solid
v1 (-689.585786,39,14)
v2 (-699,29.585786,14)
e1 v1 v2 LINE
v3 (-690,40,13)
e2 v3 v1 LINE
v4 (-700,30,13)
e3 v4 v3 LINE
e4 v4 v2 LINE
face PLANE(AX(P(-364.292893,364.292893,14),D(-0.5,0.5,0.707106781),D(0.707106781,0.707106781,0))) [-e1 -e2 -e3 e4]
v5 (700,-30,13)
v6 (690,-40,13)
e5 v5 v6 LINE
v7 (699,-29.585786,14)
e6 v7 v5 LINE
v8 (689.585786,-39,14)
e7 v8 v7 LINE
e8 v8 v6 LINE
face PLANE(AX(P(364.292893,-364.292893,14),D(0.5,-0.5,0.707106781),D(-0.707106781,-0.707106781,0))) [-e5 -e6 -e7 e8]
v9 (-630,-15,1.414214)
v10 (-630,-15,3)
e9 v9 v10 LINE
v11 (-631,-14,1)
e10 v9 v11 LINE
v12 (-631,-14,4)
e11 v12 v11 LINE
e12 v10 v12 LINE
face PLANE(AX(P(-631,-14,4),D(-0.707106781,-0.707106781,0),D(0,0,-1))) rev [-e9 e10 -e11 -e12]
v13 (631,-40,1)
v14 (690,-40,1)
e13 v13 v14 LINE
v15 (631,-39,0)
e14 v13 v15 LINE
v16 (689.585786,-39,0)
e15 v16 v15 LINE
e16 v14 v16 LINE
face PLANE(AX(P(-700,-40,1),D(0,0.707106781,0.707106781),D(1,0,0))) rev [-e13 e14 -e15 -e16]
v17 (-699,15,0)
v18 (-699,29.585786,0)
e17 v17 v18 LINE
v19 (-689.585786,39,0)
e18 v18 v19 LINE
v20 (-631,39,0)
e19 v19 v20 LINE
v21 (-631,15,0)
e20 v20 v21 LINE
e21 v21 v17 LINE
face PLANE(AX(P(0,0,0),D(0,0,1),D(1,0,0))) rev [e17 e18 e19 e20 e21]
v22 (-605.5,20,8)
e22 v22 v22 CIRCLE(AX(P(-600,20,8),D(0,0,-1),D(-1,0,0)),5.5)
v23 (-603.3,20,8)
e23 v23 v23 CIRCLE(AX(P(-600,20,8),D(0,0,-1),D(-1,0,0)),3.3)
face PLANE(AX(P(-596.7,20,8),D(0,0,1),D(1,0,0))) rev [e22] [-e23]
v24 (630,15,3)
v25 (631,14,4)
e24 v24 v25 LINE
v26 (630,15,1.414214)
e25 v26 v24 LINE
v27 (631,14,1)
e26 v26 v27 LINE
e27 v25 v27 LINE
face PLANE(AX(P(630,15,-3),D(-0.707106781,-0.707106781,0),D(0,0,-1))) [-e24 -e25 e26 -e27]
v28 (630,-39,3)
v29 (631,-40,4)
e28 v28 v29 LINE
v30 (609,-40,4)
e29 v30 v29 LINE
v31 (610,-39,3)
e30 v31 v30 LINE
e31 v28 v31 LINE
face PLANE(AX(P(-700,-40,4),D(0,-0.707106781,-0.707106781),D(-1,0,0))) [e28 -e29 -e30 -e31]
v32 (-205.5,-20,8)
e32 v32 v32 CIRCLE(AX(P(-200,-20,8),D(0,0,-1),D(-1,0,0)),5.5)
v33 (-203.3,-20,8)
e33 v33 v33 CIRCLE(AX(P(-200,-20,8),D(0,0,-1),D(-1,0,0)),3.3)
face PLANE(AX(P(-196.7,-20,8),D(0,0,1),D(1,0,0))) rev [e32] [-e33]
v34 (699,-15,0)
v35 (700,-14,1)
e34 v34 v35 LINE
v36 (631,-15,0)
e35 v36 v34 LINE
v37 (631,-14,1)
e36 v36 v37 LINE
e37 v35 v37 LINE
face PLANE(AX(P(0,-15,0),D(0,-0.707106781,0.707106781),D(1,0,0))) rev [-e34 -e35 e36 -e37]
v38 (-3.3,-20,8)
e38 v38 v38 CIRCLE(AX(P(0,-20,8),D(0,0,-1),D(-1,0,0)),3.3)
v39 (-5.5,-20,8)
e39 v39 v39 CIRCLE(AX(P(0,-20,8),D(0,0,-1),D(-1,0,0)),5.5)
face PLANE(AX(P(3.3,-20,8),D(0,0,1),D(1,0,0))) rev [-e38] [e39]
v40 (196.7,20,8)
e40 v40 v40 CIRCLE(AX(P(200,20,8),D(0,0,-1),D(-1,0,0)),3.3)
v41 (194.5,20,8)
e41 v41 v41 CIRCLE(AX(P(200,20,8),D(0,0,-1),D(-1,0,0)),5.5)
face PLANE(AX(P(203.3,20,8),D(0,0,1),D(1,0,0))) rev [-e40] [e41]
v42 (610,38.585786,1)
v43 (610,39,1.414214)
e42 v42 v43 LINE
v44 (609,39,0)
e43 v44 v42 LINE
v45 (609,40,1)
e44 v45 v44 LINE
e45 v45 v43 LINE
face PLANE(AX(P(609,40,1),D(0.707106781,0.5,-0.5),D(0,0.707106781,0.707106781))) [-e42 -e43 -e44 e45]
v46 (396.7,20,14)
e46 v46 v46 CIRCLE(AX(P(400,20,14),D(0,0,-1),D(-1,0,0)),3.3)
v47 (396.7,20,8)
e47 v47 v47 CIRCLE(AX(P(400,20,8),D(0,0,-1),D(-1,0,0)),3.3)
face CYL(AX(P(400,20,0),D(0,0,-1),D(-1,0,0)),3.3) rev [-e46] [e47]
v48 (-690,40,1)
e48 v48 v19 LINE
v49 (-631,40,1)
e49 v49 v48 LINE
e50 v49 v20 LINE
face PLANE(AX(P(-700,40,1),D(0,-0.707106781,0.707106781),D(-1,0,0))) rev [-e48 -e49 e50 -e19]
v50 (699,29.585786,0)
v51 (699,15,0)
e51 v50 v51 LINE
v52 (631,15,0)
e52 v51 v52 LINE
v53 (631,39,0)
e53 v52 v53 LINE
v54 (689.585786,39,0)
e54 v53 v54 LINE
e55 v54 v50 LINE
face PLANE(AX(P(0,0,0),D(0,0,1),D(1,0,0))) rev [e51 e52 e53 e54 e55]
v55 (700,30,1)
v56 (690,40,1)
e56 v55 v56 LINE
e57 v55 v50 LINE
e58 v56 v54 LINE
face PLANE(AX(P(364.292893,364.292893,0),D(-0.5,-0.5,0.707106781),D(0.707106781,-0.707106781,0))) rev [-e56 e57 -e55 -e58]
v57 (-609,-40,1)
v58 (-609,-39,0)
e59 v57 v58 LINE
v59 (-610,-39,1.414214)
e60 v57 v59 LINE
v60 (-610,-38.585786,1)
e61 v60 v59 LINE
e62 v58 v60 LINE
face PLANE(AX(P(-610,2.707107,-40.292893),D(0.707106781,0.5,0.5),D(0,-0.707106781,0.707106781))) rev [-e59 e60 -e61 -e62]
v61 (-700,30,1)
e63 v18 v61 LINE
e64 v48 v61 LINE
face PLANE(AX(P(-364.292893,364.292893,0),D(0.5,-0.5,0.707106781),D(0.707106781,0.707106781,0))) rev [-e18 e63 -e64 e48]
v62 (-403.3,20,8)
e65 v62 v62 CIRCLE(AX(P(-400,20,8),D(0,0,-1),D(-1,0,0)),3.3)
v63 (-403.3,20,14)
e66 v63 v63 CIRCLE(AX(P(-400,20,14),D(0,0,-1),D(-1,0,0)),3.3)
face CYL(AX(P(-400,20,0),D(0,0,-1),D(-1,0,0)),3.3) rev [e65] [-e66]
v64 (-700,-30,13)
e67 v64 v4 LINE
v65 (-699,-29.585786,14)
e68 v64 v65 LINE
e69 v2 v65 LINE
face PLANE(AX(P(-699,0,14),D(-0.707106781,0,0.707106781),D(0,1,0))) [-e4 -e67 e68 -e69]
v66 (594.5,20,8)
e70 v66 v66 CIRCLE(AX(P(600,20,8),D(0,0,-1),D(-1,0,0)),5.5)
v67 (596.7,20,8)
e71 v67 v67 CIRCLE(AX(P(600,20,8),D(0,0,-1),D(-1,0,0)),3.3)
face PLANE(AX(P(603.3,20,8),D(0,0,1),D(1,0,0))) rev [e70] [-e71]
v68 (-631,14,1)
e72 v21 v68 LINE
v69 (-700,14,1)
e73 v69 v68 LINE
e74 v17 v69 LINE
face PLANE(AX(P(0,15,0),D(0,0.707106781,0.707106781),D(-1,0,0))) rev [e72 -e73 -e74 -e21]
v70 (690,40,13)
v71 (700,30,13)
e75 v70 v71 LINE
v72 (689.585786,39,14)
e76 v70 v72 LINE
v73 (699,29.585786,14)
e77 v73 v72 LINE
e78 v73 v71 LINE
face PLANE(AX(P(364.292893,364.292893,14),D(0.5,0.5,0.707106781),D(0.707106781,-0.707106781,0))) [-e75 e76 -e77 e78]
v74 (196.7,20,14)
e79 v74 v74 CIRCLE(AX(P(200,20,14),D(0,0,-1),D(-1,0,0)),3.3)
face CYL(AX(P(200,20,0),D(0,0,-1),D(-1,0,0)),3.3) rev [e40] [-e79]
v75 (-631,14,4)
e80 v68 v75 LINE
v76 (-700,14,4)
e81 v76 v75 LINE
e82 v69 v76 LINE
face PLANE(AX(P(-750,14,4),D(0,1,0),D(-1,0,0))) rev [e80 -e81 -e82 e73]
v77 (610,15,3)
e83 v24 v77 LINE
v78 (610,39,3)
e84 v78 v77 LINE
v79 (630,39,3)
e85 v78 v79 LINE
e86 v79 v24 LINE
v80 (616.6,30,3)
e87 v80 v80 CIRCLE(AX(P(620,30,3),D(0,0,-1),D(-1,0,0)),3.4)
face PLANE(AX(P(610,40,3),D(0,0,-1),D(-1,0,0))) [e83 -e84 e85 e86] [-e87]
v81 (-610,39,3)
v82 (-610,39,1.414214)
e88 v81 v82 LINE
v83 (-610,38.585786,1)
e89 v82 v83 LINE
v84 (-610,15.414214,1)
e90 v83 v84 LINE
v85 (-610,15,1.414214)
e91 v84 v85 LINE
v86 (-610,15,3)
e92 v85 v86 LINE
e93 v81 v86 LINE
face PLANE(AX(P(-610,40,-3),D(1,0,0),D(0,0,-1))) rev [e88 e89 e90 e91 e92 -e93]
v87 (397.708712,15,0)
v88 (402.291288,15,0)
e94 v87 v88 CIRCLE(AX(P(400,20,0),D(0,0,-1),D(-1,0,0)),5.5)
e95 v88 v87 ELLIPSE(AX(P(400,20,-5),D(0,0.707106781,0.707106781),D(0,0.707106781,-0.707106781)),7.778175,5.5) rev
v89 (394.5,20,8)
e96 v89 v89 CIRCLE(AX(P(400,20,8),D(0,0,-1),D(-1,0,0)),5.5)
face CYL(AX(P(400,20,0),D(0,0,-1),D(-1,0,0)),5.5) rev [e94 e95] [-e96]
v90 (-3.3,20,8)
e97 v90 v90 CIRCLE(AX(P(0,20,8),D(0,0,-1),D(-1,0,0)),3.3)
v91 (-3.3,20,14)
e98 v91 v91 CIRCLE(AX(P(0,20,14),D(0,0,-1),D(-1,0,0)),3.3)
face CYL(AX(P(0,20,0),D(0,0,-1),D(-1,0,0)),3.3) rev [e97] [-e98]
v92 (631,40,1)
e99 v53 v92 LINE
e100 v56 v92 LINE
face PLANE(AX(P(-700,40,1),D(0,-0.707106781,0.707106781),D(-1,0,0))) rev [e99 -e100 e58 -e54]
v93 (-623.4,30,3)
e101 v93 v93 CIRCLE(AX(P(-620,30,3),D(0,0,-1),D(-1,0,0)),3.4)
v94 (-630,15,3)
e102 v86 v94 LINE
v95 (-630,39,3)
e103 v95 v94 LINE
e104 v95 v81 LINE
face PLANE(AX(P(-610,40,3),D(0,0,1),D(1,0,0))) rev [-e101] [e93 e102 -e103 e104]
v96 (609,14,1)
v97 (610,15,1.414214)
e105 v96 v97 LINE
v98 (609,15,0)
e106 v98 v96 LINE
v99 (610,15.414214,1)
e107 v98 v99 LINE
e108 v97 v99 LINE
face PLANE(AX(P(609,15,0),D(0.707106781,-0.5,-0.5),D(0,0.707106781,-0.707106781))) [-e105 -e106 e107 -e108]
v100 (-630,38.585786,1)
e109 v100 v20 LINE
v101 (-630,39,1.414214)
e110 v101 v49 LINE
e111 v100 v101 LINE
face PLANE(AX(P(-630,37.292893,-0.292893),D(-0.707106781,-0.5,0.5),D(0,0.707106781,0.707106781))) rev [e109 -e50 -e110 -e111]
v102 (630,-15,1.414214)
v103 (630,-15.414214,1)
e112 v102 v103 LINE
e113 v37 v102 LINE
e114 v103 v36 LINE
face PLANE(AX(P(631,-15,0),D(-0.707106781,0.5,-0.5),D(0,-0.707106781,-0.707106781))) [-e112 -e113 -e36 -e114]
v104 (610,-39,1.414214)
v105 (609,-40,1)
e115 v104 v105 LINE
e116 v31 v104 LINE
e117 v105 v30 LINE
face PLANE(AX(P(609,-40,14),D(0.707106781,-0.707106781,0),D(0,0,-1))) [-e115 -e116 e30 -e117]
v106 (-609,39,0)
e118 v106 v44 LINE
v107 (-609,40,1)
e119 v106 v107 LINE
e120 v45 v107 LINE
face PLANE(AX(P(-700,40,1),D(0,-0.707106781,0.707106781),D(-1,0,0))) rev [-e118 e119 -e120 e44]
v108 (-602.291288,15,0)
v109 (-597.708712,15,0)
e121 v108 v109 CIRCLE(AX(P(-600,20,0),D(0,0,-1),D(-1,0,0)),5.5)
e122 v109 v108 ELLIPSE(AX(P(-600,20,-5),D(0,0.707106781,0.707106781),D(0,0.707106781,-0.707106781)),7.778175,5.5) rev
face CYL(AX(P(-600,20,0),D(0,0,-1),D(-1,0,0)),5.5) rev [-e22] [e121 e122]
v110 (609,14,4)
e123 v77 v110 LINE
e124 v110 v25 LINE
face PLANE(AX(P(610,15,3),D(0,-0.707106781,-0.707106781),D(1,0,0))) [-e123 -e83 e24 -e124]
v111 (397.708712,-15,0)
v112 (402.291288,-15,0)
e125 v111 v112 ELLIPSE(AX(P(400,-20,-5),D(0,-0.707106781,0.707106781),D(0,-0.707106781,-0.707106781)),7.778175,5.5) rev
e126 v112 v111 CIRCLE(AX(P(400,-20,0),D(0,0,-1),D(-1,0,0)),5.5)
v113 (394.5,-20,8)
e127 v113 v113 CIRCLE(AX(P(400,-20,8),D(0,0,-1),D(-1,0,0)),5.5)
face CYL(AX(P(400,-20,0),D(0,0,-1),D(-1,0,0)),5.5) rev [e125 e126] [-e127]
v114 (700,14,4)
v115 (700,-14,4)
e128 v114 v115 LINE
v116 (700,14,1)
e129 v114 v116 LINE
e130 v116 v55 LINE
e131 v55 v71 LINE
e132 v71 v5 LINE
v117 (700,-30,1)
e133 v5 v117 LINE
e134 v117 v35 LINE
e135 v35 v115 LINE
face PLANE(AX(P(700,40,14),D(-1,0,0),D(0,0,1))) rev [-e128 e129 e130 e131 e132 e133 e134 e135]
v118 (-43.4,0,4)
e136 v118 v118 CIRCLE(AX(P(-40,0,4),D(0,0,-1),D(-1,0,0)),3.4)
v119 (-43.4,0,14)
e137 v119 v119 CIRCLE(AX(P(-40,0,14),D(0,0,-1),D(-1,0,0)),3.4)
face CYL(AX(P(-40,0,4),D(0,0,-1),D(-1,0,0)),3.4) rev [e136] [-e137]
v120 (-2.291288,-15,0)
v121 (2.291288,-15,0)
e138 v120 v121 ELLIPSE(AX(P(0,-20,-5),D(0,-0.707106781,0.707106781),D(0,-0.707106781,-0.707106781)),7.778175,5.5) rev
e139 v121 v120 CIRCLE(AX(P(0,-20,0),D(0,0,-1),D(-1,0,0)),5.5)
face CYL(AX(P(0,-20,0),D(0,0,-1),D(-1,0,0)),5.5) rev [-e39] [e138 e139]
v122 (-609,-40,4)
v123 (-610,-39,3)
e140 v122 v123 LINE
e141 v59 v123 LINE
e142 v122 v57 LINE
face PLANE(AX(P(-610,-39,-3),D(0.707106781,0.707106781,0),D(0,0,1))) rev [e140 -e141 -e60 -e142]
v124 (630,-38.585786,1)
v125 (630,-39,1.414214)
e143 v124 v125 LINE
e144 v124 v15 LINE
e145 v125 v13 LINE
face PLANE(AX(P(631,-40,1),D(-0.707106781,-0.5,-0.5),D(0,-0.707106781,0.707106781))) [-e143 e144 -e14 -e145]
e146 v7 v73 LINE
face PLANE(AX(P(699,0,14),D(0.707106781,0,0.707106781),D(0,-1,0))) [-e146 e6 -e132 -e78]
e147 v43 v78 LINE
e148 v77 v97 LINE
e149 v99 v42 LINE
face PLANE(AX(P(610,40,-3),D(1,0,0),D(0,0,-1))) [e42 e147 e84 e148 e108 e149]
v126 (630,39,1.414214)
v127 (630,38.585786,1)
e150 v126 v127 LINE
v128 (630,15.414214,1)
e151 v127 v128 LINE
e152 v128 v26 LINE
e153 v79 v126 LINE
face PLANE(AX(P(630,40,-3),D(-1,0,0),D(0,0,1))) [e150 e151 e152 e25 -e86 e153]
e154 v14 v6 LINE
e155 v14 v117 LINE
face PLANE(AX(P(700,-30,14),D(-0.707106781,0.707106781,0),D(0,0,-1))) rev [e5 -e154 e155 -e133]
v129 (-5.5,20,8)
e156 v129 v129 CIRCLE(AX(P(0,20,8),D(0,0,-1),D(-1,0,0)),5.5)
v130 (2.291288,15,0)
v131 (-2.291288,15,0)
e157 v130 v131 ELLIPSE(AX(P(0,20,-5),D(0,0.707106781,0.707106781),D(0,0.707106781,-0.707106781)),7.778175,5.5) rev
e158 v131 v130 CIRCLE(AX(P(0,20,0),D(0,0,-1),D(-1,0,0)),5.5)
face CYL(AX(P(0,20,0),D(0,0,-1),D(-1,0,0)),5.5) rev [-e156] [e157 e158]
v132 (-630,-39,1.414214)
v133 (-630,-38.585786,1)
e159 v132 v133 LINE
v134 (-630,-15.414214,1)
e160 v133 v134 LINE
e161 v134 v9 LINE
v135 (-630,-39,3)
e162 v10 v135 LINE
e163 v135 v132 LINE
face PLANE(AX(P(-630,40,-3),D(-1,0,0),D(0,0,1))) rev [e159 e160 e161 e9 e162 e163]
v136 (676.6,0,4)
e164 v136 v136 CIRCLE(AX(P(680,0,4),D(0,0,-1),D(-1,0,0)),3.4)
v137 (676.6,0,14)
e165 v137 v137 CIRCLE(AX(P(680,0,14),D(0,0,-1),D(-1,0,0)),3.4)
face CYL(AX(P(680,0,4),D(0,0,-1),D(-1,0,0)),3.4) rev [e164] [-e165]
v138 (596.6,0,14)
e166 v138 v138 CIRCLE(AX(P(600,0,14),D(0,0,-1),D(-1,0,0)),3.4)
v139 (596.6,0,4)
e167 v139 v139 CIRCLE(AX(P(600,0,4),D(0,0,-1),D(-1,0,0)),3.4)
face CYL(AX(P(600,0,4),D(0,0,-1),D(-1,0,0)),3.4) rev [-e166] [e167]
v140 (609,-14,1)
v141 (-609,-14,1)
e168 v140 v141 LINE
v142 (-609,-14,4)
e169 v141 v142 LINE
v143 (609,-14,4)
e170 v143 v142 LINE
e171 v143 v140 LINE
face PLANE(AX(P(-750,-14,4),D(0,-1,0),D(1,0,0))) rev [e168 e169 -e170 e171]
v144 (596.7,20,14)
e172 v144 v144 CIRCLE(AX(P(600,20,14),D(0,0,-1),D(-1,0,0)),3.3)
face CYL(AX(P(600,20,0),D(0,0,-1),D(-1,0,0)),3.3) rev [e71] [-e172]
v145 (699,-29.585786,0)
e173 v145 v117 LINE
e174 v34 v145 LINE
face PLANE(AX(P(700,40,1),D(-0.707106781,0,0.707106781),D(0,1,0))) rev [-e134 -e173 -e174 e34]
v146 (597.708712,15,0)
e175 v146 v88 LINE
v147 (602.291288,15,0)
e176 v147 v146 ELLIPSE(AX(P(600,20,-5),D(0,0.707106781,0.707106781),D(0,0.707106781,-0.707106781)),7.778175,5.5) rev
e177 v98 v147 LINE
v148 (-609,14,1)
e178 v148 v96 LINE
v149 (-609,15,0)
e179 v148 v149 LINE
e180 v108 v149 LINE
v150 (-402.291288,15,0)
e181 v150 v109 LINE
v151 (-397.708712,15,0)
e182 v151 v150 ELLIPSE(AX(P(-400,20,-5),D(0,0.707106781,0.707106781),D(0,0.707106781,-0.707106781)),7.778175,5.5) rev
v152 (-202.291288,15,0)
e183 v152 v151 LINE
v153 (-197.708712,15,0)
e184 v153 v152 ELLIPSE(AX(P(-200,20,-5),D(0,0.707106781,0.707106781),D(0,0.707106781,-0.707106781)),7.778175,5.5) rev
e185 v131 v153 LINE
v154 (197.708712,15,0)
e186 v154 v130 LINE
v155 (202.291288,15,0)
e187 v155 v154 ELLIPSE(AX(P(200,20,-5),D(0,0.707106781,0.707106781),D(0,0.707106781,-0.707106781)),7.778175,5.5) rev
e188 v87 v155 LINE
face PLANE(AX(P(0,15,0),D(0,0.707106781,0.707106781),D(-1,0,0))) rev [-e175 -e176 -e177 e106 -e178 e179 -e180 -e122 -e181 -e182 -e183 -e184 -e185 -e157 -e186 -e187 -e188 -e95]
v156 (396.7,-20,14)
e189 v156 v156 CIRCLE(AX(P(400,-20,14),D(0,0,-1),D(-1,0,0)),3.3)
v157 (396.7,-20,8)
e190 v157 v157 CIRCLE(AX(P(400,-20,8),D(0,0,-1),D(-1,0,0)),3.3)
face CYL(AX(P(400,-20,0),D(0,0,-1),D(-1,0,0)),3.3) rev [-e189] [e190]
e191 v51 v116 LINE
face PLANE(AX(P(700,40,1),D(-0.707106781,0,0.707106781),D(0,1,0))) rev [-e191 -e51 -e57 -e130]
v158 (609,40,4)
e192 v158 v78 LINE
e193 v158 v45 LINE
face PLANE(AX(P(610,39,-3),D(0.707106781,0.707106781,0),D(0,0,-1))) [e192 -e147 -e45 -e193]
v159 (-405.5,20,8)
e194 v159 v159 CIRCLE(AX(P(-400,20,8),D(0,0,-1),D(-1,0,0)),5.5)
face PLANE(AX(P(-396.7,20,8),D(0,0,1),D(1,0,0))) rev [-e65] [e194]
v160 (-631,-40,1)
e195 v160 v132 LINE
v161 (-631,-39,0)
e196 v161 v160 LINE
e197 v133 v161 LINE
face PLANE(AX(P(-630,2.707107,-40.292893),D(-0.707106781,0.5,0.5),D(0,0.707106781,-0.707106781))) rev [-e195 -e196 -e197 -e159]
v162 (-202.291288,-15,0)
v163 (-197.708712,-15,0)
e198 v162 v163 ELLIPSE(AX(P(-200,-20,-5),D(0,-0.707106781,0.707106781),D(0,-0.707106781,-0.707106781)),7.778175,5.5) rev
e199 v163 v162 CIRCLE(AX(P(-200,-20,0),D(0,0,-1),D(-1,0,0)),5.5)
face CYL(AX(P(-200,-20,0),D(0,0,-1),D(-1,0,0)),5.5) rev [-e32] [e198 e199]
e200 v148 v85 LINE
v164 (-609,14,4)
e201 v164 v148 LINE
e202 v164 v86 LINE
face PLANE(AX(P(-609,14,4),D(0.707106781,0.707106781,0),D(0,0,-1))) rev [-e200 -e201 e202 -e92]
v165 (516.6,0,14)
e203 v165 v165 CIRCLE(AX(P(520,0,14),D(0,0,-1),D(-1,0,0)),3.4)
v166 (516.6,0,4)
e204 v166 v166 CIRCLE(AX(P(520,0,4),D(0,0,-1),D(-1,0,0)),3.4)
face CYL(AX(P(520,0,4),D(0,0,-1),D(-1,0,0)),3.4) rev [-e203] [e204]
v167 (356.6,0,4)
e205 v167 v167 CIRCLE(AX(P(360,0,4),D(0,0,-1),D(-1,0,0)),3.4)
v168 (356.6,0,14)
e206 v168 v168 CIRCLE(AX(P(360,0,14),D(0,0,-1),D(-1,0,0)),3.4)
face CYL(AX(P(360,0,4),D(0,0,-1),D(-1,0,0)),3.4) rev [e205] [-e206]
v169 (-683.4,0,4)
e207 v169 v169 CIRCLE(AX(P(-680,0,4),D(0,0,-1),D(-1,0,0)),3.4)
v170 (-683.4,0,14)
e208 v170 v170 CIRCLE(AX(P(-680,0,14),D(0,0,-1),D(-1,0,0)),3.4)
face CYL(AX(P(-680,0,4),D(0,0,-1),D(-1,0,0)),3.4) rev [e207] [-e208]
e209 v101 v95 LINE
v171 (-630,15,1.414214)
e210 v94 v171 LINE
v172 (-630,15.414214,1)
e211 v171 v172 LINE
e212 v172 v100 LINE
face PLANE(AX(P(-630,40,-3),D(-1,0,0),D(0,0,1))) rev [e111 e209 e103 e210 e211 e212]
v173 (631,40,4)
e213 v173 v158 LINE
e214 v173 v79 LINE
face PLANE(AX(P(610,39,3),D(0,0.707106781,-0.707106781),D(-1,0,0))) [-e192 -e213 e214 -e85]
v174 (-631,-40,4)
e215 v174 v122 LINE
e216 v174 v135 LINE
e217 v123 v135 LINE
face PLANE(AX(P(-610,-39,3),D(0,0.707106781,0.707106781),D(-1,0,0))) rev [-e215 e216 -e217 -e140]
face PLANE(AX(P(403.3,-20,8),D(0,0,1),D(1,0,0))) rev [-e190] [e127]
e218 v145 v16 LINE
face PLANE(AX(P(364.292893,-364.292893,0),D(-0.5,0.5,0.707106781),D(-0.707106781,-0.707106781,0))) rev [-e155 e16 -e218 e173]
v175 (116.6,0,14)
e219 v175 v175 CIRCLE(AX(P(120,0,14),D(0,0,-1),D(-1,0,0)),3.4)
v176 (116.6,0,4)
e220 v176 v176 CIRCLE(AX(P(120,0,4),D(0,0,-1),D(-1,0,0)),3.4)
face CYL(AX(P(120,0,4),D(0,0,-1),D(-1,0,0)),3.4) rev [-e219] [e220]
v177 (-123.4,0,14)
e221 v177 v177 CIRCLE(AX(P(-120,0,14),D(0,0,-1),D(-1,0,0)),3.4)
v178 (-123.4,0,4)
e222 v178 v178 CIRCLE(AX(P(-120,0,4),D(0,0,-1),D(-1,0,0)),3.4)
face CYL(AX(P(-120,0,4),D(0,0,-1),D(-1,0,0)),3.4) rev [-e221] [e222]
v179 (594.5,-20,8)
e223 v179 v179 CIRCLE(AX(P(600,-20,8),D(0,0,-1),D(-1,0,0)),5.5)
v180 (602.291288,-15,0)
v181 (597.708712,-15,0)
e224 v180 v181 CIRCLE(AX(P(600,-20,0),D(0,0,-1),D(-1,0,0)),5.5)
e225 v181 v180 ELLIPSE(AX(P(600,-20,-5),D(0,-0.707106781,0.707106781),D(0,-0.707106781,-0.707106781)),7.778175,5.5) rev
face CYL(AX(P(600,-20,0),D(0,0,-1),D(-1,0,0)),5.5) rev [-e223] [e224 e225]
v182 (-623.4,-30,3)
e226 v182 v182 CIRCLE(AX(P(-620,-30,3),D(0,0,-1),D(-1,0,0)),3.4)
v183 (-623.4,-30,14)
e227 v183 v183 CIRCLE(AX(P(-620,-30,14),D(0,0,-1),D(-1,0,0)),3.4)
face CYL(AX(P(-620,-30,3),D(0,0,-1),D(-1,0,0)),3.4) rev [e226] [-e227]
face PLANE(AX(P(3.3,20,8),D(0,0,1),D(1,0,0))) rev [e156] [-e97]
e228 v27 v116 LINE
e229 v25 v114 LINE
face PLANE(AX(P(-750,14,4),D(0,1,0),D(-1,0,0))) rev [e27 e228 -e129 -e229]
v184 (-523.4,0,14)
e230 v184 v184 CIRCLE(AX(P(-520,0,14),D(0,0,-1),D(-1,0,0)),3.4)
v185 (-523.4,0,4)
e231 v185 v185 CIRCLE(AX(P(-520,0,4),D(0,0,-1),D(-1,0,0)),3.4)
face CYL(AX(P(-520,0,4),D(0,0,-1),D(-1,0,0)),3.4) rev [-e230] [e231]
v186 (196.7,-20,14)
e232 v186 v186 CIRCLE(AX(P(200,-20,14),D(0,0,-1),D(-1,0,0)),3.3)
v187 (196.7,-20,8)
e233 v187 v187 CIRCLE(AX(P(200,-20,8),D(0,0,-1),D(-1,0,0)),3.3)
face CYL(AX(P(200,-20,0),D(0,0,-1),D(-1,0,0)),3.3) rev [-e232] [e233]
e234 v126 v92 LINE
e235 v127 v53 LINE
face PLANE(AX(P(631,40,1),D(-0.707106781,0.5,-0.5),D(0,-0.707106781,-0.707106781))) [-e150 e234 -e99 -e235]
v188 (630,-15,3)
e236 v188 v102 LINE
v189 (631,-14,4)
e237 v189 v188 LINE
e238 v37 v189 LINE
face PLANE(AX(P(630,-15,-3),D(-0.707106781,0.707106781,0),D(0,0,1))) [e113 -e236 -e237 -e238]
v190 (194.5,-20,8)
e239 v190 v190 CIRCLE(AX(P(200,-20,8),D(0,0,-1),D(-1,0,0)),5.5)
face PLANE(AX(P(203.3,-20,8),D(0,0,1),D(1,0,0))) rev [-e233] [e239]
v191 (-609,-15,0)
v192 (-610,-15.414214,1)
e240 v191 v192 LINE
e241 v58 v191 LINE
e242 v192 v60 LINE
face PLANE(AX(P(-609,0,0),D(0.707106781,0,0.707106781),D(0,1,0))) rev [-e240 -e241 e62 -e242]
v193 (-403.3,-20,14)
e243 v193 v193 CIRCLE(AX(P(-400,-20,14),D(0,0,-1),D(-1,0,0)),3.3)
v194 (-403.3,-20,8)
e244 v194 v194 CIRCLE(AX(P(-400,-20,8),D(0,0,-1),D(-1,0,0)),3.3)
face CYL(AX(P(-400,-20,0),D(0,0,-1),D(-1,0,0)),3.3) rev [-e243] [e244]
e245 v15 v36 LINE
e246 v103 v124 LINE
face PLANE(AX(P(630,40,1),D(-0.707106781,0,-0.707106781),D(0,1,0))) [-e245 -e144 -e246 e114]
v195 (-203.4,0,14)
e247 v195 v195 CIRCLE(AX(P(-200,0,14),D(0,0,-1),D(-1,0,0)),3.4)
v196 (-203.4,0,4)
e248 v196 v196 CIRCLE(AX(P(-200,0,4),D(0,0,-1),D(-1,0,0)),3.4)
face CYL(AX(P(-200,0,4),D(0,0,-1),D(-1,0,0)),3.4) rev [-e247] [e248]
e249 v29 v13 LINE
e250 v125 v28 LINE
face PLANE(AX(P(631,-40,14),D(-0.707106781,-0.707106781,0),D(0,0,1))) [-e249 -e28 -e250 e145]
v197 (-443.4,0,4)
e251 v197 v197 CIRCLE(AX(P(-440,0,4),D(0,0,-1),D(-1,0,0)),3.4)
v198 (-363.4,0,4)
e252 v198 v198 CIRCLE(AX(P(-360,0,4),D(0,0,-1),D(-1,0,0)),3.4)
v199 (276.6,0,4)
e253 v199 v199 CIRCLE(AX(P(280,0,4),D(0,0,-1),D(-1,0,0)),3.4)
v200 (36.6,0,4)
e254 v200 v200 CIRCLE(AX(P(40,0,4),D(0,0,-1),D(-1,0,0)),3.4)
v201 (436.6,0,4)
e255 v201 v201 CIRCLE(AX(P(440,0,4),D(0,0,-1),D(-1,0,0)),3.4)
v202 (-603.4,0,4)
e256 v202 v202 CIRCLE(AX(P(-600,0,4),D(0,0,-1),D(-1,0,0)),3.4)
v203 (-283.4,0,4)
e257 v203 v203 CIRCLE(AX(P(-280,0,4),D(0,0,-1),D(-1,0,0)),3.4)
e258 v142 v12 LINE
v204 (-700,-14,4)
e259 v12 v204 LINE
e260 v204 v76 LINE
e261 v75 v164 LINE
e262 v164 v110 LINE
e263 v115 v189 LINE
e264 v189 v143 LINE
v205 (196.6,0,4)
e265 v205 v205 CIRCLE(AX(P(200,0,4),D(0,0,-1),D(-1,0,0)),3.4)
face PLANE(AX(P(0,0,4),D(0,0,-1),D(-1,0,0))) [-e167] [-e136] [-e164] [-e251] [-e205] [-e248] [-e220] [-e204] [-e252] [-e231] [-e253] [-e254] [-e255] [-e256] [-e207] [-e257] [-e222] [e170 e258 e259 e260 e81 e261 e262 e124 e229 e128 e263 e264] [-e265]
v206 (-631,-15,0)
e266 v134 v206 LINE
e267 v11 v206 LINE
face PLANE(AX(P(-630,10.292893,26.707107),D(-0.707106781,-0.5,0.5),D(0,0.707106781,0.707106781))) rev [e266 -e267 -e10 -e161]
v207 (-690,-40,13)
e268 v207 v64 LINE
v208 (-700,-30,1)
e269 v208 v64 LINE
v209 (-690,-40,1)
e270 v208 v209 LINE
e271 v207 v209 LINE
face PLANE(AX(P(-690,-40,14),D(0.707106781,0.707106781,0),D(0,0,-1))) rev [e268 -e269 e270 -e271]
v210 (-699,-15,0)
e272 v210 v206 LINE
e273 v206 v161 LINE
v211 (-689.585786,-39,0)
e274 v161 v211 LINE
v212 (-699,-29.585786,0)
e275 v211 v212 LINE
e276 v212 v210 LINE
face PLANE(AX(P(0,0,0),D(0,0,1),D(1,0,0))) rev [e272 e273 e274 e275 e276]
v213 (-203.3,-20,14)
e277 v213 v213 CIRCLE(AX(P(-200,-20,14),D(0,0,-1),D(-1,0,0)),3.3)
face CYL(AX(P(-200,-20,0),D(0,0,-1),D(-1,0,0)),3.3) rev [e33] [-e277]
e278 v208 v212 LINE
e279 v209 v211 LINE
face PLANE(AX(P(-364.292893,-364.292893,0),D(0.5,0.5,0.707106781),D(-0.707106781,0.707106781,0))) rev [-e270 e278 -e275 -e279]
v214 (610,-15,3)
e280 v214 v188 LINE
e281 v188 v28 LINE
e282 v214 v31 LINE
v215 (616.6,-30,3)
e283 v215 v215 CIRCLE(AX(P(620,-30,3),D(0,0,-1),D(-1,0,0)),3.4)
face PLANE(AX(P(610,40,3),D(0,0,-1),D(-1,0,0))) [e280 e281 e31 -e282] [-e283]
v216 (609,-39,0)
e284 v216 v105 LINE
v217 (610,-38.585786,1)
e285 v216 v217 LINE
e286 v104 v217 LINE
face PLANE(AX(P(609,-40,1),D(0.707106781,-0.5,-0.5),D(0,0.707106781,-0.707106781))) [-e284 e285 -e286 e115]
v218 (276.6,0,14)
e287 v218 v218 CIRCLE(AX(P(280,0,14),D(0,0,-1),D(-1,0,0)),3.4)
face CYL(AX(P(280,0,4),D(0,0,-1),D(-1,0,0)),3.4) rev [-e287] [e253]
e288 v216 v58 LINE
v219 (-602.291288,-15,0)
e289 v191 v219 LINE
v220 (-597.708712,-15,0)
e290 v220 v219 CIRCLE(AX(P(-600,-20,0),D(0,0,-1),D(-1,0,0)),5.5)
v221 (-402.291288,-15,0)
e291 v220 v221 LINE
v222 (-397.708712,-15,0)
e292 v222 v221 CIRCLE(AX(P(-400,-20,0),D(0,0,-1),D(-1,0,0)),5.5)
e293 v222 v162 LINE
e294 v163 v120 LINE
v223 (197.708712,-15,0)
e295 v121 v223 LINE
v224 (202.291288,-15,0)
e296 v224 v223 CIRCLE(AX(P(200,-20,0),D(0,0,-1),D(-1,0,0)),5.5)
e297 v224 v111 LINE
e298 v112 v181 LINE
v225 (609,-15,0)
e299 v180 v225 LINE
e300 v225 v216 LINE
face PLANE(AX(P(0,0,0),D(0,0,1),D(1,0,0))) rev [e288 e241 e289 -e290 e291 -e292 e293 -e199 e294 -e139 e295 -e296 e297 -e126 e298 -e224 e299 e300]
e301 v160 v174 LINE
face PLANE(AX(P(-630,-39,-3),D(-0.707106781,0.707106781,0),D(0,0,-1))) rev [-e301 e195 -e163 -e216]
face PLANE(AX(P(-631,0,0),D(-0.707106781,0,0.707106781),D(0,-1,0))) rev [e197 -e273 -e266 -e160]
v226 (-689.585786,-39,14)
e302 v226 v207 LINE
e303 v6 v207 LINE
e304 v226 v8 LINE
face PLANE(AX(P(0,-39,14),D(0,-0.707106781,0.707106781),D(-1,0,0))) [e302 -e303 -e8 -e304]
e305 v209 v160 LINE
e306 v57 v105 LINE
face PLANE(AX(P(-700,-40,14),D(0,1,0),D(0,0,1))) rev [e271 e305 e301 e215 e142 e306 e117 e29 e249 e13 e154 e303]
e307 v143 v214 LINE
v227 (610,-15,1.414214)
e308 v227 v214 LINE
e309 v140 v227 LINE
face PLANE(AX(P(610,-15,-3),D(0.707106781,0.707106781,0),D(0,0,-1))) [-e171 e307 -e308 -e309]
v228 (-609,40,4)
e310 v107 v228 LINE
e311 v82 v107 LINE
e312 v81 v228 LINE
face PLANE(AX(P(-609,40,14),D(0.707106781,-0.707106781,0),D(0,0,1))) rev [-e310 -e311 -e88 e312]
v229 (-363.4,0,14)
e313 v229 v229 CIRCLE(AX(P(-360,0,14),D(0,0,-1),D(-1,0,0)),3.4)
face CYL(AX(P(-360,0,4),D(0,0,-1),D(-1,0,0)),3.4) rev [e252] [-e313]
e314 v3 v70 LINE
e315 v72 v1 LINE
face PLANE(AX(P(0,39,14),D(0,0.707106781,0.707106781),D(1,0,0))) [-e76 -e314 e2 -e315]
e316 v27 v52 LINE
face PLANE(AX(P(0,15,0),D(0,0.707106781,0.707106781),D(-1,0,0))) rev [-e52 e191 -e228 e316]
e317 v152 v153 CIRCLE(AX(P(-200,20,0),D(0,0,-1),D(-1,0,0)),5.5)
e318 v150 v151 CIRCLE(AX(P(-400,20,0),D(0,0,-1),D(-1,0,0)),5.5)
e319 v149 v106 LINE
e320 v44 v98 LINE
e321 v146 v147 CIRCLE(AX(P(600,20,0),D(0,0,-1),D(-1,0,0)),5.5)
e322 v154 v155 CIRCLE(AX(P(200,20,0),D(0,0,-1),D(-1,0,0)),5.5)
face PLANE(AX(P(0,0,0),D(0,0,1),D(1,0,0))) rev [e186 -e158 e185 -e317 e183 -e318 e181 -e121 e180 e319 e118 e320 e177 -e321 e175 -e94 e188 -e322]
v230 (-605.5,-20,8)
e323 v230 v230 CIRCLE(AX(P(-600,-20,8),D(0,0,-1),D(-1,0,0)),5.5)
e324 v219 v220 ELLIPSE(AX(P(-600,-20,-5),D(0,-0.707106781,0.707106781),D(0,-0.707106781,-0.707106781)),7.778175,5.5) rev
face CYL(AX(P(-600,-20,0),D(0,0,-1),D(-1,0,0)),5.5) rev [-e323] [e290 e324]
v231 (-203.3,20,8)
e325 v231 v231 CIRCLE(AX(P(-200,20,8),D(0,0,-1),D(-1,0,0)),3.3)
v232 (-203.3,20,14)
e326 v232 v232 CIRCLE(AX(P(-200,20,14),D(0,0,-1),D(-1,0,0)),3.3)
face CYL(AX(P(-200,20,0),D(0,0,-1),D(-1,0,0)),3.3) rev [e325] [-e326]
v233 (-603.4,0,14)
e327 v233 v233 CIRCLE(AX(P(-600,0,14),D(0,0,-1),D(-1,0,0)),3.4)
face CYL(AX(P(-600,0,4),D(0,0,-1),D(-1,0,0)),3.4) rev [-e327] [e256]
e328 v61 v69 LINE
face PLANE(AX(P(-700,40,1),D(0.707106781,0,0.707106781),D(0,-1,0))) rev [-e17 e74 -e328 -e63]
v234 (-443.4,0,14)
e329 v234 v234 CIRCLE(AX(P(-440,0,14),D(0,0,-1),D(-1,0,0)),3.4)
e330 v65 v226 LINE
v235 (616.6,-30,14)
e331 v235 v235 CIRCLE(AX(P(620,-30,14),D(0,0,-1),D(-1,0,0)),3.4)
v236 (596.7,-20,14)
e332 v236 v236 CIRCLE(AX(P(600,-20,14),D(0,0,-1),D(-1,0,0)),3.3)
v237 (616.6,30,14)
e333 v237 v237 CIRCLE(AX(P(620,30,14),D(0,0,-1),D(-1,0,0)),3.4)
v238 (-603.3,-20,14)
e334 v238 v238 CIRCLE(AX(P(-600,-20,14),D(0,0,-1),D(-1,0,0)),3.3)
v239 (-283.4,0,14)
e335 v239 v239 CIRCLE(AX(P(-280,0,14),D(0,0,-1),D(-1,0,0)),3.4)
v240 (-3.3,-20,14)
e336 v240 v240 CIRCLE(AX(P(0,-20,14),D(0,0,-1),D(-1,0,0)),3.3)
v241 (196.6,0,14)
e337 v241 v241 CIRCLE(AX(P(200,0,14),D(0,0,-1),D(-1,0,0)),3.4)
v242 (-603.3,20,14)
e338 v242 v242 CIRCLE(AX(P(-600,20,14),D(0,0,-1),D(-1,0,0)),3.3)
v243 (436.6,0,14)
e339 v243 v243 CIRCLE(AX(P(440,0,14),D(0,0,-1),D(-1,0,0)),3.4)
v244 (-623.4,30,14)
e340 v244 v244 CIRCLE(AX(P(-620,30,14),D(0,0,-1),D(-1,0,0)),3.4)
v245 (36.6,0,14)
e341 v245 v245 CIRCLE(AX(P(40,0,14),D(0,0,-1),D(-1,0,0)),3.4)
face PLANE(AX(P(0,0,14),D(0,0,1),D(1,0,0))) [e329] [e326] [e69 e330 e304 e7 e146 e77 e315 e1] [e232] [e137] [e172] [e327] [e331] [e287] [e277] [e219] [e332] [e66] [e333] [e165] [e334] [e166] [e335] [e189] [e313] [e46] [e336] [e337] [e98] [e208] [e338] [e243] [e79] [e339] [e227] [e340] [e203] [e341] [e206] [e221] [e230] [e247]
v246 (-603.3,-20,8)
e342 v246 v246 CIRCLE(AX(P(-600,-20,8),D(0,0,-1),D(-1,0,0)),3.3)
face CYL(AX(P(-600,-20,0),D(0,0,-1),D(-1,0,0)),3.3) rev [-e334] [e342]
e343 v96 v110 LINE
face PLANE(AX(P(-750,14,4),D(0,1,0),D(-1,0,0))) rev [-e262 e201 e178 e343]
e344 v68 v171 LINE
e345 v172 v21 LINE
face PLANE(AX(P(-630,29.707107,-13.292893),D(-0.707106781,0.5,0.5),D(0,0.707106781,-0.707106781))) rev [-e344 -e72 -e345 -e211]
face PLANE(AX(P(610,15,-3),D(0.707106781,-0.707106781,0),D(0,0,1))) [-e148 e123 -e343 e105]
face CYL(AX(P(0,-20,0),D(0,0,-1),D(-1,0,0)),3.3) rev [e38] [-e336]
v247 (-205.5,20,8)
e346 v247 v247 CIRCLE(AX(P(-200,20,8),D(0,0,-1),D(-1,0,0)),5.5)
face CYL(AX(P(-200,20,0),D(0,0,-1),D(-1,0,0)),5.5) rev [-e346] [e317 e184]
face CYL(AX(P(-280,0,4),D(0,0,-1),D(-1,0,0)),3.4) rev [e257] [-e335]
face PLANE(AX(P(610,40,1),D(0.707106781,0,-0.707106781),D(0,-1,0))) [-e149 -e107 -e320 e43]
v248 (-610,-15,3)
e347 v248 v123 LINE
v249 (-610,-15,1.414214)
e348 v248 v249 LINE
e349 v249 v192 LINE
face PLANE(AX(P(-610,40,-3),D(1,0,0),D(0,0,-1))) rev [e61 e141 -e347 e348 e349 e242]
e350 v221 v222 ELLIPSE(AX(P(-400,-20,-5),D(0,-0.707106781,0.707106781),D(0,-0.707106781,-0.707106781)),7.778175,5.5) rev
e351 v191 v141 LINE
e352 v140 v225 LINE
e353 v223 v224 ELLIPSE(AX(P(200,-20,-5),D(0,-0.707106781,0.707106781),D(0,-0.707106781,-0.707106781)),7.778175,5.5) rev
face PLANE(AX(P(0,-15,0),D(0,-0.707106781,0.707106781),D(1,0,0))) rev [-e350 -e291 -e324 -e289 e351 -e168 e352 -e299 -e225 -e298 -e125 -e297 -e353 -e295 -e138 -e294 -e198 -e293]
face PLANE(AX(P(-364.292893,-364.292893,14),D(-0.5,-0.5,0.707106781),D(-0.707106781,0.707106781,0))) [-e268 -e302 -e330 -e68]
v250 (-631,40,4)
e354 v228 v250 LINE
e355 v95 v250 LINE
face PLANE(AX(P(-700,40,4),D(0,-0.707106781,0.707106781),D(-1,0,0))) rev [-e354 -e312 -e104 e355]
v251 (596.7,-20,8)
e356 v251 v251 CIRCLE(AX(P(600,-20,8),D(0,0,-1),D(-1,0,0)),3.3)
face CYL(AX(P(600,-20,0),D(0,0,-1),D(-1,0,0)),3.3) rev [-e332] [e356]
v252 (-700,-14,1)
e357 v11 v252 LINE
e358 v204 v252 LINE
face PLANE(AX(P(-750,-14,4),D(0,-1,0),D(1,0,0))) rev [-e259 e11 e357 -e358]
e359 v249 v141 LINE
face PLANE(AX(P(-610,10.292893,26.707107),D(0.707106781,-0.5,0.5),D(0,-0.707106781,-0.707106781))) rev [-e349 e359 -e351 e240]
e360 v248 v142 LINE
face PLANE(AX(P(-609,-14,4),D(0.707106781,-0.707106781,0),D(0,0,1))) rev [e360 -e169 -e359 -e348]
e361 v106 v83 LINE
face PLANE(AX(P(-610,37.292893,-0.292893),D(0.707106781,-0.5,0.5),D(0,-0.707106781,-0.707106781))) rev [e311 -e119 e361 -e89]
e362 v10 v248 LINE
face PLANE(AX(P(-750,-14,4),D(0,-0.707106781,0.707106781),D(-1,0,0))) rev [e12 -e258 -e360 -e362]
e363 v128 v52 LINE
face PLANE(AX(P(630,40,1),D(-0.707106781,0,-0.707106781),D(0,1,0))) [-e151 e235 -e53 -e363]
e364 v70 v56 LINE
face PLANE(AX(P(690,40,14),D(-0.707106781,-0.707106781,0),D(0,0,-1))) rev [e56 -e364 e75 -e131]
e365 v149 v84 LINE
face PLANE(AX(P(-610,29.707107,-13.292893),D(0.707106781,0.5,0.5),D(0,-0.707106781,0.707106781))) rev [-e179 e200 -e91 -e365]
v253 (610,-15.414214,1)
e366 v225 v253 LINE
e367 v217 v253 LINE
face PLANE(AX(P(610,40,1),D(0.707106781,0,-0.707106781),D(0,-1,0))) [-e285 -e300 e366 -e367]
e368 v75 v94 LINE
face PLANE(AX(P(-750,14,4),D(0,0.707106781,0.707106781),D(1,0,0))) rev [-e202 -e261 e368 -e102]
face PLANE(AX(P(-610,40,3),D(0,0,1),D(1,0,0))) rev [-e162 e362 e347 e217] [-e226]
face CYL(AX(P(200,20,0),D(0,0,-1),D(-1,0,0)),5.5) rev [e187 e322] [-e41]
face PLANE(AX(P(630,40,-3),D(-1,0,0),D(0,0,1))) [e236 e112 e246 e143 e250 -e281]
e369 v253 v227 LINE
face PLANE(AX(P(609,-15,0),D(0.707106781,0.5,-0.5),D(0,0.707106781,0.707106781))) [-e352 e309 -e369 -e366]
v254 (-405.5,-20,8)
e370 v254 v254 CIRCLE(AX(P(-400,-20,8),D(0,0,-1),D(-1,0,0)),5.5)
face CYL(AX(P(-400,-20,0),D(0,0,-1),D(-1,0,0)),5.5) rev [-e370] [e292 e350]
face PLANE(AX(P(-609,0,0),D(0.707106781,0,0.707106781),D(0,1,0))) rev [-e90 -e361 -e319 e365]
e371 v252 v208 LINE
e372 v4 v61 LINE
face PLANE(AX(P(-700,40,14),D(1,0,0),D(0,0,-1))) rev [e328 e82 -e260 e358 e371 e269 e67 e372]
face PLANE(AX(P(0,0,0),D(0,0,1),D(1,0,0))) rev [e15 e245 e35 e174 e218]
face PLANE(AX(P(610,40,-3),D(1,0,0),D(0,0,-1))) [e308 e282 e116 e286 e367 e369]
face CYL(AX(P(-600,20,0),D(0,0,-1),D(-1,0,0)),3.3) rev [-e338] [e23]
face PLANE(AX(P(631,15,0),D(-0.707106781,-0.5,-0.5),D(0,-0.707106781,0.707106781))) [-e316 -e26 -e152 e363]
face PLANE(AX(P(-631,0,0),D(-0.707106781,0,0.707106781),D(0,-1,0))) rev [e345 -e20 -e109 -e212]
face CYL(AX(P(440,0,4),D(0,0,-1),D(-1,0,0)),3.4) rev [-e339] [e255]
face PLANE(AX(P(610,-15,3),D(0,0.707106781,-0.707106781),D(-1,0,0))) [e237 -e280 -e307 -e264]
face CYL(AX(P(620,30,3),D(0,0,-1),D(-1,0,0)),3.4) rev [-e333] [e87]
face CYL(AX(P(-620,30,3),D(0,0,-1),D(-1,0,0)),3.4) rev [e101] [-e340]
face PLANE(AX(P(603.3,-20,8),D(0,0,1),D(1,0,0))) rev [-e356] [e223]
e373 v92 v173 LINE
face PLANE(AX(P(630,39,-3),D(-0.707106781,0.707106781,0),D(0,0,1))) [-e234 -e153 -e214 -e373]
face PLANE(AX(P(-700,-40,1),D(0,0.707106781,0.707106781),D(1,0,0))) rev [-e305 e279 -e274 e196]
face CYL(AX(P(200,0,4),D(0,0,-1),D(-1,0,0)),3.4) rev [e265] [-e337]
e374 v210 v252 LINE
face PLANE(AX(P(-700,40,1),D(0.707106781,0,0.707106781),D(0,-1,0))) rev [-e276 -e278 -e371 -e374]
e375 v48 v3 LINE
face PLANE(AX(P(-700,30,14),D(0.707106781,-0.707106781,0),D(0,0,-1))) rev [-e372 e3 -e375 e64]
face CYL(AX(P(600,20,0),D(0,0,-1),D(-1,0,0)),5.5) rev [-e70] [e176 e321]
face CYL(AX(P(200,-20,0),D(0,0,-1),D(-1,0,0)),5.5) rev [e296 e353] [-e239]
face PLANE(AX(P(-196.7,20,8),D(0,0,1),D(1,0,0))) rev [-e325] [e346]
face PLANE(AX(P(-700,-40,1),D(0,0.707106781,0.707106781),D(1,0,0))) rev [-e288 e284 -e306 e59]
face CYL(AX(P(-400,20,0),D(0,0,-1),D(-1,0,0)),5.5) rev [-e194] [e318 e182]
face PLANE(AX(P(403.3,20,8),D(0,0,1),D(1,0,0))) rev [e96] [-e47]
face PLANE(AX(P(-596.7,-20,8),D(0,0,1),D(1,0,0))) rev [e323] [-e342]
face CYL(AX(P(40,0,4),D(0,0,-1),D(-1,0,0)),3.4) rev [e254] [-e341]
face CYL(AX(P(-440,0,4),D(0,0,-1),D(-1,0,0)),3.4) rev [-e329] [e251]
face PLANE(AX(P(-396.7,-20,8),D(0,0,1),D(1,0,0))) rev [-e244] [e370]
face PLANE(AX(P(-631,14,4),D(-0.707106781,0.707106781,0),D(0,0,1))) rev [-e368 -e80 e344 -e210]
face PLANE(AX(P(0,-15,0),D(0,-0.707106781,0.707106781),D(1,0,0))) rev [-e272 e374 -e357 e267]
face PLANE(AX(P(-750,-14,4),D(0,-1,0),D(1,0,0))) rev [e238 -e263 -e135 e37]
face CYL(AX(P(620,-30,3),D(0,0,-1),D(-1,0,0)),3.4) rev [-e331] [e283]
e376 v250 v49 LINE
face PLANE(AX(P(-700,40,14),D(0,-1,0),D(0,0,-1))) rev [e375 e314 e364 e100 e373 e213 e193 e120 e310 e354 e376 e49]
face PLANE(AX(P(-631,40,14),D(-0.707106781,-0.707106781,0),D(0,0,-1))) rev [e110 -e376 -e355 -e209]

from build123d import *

# Parameters (mm, degrees)
SKETCH_1_W                 = 1400
SKETCH_1_H                 = 80
EXTRUDE_1_DEPTH            = 14
SKETCH_2_W                 = 1500
SKETCH_2_H                 = 28
CUT_EXTRUDE_1_DEPTH        = 4
HOLE_WIZARD_1_D            = 6.6
HOLE_WIZARD_1_CBORE_D      = 11
HOLE_WIZARD_1_CBORE_DEPTH  = 8
PATTERN_LINEAR_1_COUNT     = 4
PATTERN_LINEAR_1_PITCH     = 200
PATTERN_LINEAR_1_COL_COUNT = 4
PATTERN_LINEAR_1_COL_PITCH = 200
HOLE_WIZARD_M8_1_D         = 6.8
PATTERN_LINEAR_2_COUNT     = 18
PATTERN_LINEAR_2_PITCH     = 80
CHAMFER_1_SIZE             = 10
CHAMFER_2_SIZE             = 1
SKETCH_9_W                 = 20
SKETCH_9_H                 = 6
CUT_EXTRUDE_2_DEPTH        = 705.695678999
HOLE_WIZARD_M8_2_D         = 6.8
CHAMFER_3_SIZE             = 1


# Some blends are built 0.0001 mm under size
with BuildPart() as part:
    # 草图1 → 凸台-拉伸1 (new body)
    with BuildSketch(Plane.XY):
        Rectangle(SKETCH_1_W, SKETCH_1_H)
    extrude(amount=EXTRUDE_1_DEPTH)

    # 草图2 → 切除-拉伸1 (cut)
    with BuildSketch(Plane(origin=(0, 0, 0), x_dir=(-1, 0, 0), z_dir=(0, 0, -1))):
        Rectangle(SKETCH_2_W, SKETCH_2_H)
    extrude(amount=-CUT_EXTRUDE_1_DEPTH, mode=Mode.SUBTRACT)

    # 打孔尺寸(%根据)内六角圆柱头螺钉的类型1 (through all)
    with Locations(Plane(origin=(0, 0, 0), x_dir=(-1, 0, 0), z_dir=(0, 0, -1))):
        with Locations((0, -20), (0, 20)):
            hole_wizard_1 = CounterBoreHole(HOLE_WIZARD_1_D / 2, HOLE_WIZARD_1_CBORE_D / 2, HOLE_WIZARD_1_CBORE_DEPTH)

    # 阵列(线性)1: 打孔尺寸(%根据)内六角圆柱头螺钉的类型1 ×4
    with Locations(*[(i * PATTERN_LINEAR_1_PITCH, 0, 0) for i in range(1, PATTERN_LINEAR_1_COUNT)]):
        add(hole_wizard_1, mode=Mode.SUBTRACT)

    # 阵列(线性)1 col: 打孔尺寸(%根据)内六角圆柱头螺钉的类型1 ×4
    with Locations(*[(-i * PATTERN_LINEAR_1_COL_PITCH, 0, 0) for i in range(1, PATTERN_LINEAR_1_COL_COUNT)]):
        add(hole_wizard_1, mode=Mode.SUBTRACT)

    # M8 螺纹孔1 (through all)
    with Locations(Plane(origin=(0, 0, 4), x_dir=(-1, 0, 0), z_dir=(0, 0, -1))):
        with Locations((-680, 0)):
            hole_wizard_m8_1 = Hole(HOLE_WIZARD_M8_1_D / 2)

    # 阵列(线性)2: M8 螺纹孔1 ×18
    with Locations(*[(-i * PATTERN_LINEAR_2_PITCH, 0, 0) for i in range(1, PATTERN_LINEAR_2_COUNT)]):
        add(hole_wizard_m8_1, mode=Mode.SUBTRACT)

    # 倒角1
    chamfer_1_edges = [part.edges().sort_by_distance(p)[0] for p in [
        (700, -40, 7),
        (-700, -40, 7),
        (-700, 40, 7),
        (700, 40, 7),
    ]]
    chamfer(chamfer_1_edges, length=CHAMFER_1_SIZE)

    # 倒角2
    # the kernel refuses this chamfer: 1 mm, written as the material it takes off along each edge
    with BuildSketch(Plane(origin=(700, 32.571682988, 0), x_dir=(-0.9996219169112968, 0, -0.027495876610586483), z_dir=(0, -1, 0)), Plane(origin=(-700, 11.428317012, 0), x_dir=(0.9996219169112968, 0, -0.027495876610586483), z_dir=(0, 1, 0))) as chamfer_2_piece_1:
        Polygon((CHAMFER_2_SIZE * 0.999621916911, -CHAMFER_2_SIZE * 0.0274958766106), (-CHAMFER_2_SIZE * 0.0274958766106, -CHAMFER_2_SIZE * 0.999621916911), (0, 0), align=None)
    extrude(amount=21.143365976, mode=Mode.SUBTRACT)
    with BuildSketch(Plane(origin=(-700, -32.571682988, 0), x_dir=(-0.027495876610582174, 0, 0.9996219169112968), z_dir=(0, 1, 0)), Plane(origin=(700, -11.428317012, 0), x_dir=(0.027495876610582174, 0, 0.9996219169112968), z_dir=(0, -1, 0))) as chamfer_2_piece_2:
        Polygon((CHAMFER_2_SIZE * 0.999621916911, CHAMFER_2_SIZE * 0.0274958766106), (-CHAMFER_2_SIZE * 0.0274958766106, CHAMFER_2_SIZE * 0.999621916911), (0, 0), align=None)
    extrude(amount=21.143365976, mode=Mode.SUBTRACT)
    with BuildSketch(Plane(origin=(-702.571682988, -14, 0), x_dir=(0, -0.9996219169112968, -0.02749587661058639), z_dir=(1, 0, 0)), Plane(origin=(702.571682988, 14, 0), x_dir=(0, 0.9996219169112968, -0.02749587661058639), z_dir=(-1, 0, 0))) as chamfer_2_piece_3:
        Polygon((CHAMFER_2_SIZE * 0.999621916911, -CHAMFER_2_SIZE * 0.0274958766106), (-CHAMFER_2_SIZE * 0.0274958766106, -CHAMFER_2_SIZE * 0.999621916911), (0, 0), align=None)
    extrude(amount=1405.143365976, mode=Mode.SUBTRACT)
    with BuildSketch(Plane(origin=(692.571682988, -40, 0), x_dir=(0, -0.02749587661058908, 0.9996219169112968), z_dir=(-1, 0, 0)), Plane(origin=(692.571682988, -40, 14), x_dir=(0, 0.9996219169112968, 0.02749587661058555), z_dir=(-1, 0, 0)), Plane(origin=(-692.571682988, 40, 0), x_dir=(0, 0.02749587661058908, 0.9996219169112968), z_dir=(1, 0, 0))) as chamfer_2_piece_4:
        Polygon((CHAMFER_2_SIZE * 0.999621916911, CHAMFER_2_SIZE * 0.0274958766106), (-CHAMFER_2_SIZE * 0.0274958766106, CHAMFER_2_SIZE * 0.999621916911), (0, 0), align=None)
    extrude(amount=1385.143365976, mode=Mode.SUBTRACT)
    with BuildSketch(Plane(origin=(701.81845448, -28.18154552, 0), x_dir=(0.01944252080600517, -0.01944252080600517, 0.9996219169112972), z_dir=(-0.7071067811865476, -0.7071067811865476, 0)), Plane(origin=(701.81845448, -28.18154552, 14), x_dir=(-0.7068394360706735, 0.7068394360706735, 0.027495876610585897), z_dir=(-0.7071067811865476, -0.7071067811865476, 0)), Plane(origin=(-688.18154552, 41.81845448, 14), x_dir=(-0.019442520805986165, 0.019442520805986165, -0.9996219169112978), z_dir=(-0.7071067811865476, -0.7071067811865476, 0)), Plane(origin=(-688.18154552, 41.81845448, 0), x_dir=(0.7068394360706736, -0.7068394360706736, -0.02749587661058688), z_dir=(-0.7071067811865476, -0.7071067811865476, 0))) as chamfer_2_piece_5:
        Polygon((CHAMFER_2_SIZE * 0.999621916911, CHAMFER_2_SIZE * 0.0274958766106), (-CHAMFER_2_SIZE * 0.0274958766106, CHAMFER_2_SIZE * 0.999621916911), (0, 0), align=None)
    extrude(amount=19.2855016, mode=Mode.SUBTRACT)
    with BuildSketch(Plane(origin=(-701.81845448, -28.18154552, 0), x_dir=(-0.01944252080600517, -0.01944252080600517, 0.9996219169112972), z_dir=(0.7071067811865476, -0.7071067811865476, 0)), Plane(origin=(688.18154552, 41.81845448, 14), x_dir=(0.019442520805986165, 0.019442520805986165, -0.9996219169112978), z_dir=(0.7071067811865476, -0.7071067811865476, 0)), Plane(origin=(-701.81845448, -28.18154552, 14), x_dir=(0.7068394360706735, 0.7068394360706735, 0.027495876610585897), z_dir=(0.7071067811865476, -0.7071067811865476, 0)), Plane(origin=(688.18154552, 41.81845448, 0), x_dir=(-0.7068394360706736, -0.7068394360706736, -0.02749587661058688), z_dir=(0.7071067811865476, -0.7071067811865476, 0))) as chamfer_2_piece_6:
        Polygon((CHAMFER_2_SIZE * 0.999621916911, -CHAMFER_2_SIZE * 0.0274958766106), (-CHAMFER_2_SIZE * 0.0274958766106, -CHAMFER_2_SIZE * 0.999621916911), (0, 0), align=None)
    extrude(amount=19.2855016, mode=Mode.SUBTRACT)
    with BuildSketch(Plane(origin=(-700, -32.571682988, 14), x_dir=(0.9996219169112968, 0, 0.02749587661058574), z_dir=(0, 1, 0)), Plane(origin=(700, 32.571682988, 14), x_dir=(-0.9996219169112968, 0, 0.02749587661058574), z_dir=(0, -1, 0))) as chamfer_2_piece_7:
        Polygon((CHAMFER_2_SIZE * 0.999621916911, CHAMFER_2_SIZE * 0.0274958766106), (-CHAMFER_2_SIZE * 0.0274958766106, CHAMFER_2_SIZE * 0.999621916911), (0, 0), align=None)
    extrude(amount=65.143365976, mode=Mode.SUBTRACT)
    with BuildSketch(Plane(origin=(-692.571682988, 40, 14), x_dir=(0, 0.0274958766105891, -0.9996219169112968), z_dir=(1, 0, 0))) as chamfer_2_piece_8:
        Polygon((CHAMFER_2_SIZE * 0.999621916911, -CHAMFER_2_SIZE * 0.0274958766106), (-CHAMFER_2_SIZE * 0.0274958766106, -CHAMFER_2_SIZE * 0.999621916911), (0, 0), align=None)
    extrude(amount=1385.143365976, mode=Mode.SUBTRACT)

    # 草图9 → 切除-拉伸2 (cut, through all)
    with BuildSketch(Plane.XZ.offset(40)):
        with Locations((-620, 0)):
            Rectangle(SKETCH_9_W, SKETCH_9_H)
    cut_extrude_2 = extrude(amount=-CUT_EXTRUDE_2_DEPTH, mode=Mode.SUBTRACT)

    # M8 螺纹孔2 (through all)
    with Locations(Plane(origin=(0, 0, 3), x_dir=(-1, 0, 0), z_dir=(0, 0, -1))):
        with Locations((620, -30), (620, 30)):
            hole_wizard_m8_2 = Hole(HOLE_WIZARD_M8_2_D / 2)

    # 镜向1: 切除-拉伸2, M8 螺纹孔2 across plane
    add(cut_extrude_2.mirror(Plane(origin=(0, 0, 0), x_dir=(0, 0, 1), z_dir=(1, 0, 0))), mode=Mode.SUBTRACT)
    add(hole_wizard_m8_2.mirror(Plane(origin=(0, 0, 0), x_dir=(0, 0, 1), z_dir=(1, 0, 0))), mode=Mode.SUBTRACT)

    # 倒角3
    chamfer_3_edges = [part.edges().sort_by_distance(p)[0] for p in [
        (-610, 39.5, 0.5),
        (-630, 39.5, 0.5),
        (-620, -14, 3),
        (-620, 14, 3),
        (-620, 40, 3),
        (-630, -14, 2),
        (-630, -27, 0),
        (-630, 14, 2),
        (-630, 40, 2),
        (-630, 27, 0),
        (-610, -14, 2),
        (-610, -27, 0),
        (-610, 14, 2),
        (-610, 27, 0),
        (-610, 40, 2),
        (-630, 14.5, 0.5),
        (-630, -39.5, 0.5),
        (-630, -14.5, 0.5),
        (-610, -14.5, 0.5),
        (-610, -39.5, 0.5),
        (-610, 14.5, 0.5),
        (-610, -40, 2),
        (-620, -40, 3),
        (-630, -40, 2),
        (610, 39.5, 0.5),
        (630, 39.5, 0.5),
        (620, -14, 3),
        (620, -40, 3),
        (630, -40, 2),
        (630, -39.5, 0.5),
        (630, -14.5, 0.5),
        (630, 14.5, 0.5),
        (610, -14.5, 0.5),
        (610, -39.5, 0.5),
        (610, -40, 2),
        (610, 14.5, 0.5),
        (630, -14, 2),
        (630, -27, 0),
        (630, 27, 0),
        (630, 14, 2),
        (610, -14, 2),
        (610, 14, 2),
        (610, 27, 0),
        (610, -27, 0),
        (620, 14, 3),
        (630, 40, 2),
        (610, 40, 2),
        (620, 40, 3),
    ]]
    chamfer(chamfer_3_edges, length=CHAMFER_3_SIZE - 0.0001)  # a hair under: the kernel refuses the full size


solid = part.part
